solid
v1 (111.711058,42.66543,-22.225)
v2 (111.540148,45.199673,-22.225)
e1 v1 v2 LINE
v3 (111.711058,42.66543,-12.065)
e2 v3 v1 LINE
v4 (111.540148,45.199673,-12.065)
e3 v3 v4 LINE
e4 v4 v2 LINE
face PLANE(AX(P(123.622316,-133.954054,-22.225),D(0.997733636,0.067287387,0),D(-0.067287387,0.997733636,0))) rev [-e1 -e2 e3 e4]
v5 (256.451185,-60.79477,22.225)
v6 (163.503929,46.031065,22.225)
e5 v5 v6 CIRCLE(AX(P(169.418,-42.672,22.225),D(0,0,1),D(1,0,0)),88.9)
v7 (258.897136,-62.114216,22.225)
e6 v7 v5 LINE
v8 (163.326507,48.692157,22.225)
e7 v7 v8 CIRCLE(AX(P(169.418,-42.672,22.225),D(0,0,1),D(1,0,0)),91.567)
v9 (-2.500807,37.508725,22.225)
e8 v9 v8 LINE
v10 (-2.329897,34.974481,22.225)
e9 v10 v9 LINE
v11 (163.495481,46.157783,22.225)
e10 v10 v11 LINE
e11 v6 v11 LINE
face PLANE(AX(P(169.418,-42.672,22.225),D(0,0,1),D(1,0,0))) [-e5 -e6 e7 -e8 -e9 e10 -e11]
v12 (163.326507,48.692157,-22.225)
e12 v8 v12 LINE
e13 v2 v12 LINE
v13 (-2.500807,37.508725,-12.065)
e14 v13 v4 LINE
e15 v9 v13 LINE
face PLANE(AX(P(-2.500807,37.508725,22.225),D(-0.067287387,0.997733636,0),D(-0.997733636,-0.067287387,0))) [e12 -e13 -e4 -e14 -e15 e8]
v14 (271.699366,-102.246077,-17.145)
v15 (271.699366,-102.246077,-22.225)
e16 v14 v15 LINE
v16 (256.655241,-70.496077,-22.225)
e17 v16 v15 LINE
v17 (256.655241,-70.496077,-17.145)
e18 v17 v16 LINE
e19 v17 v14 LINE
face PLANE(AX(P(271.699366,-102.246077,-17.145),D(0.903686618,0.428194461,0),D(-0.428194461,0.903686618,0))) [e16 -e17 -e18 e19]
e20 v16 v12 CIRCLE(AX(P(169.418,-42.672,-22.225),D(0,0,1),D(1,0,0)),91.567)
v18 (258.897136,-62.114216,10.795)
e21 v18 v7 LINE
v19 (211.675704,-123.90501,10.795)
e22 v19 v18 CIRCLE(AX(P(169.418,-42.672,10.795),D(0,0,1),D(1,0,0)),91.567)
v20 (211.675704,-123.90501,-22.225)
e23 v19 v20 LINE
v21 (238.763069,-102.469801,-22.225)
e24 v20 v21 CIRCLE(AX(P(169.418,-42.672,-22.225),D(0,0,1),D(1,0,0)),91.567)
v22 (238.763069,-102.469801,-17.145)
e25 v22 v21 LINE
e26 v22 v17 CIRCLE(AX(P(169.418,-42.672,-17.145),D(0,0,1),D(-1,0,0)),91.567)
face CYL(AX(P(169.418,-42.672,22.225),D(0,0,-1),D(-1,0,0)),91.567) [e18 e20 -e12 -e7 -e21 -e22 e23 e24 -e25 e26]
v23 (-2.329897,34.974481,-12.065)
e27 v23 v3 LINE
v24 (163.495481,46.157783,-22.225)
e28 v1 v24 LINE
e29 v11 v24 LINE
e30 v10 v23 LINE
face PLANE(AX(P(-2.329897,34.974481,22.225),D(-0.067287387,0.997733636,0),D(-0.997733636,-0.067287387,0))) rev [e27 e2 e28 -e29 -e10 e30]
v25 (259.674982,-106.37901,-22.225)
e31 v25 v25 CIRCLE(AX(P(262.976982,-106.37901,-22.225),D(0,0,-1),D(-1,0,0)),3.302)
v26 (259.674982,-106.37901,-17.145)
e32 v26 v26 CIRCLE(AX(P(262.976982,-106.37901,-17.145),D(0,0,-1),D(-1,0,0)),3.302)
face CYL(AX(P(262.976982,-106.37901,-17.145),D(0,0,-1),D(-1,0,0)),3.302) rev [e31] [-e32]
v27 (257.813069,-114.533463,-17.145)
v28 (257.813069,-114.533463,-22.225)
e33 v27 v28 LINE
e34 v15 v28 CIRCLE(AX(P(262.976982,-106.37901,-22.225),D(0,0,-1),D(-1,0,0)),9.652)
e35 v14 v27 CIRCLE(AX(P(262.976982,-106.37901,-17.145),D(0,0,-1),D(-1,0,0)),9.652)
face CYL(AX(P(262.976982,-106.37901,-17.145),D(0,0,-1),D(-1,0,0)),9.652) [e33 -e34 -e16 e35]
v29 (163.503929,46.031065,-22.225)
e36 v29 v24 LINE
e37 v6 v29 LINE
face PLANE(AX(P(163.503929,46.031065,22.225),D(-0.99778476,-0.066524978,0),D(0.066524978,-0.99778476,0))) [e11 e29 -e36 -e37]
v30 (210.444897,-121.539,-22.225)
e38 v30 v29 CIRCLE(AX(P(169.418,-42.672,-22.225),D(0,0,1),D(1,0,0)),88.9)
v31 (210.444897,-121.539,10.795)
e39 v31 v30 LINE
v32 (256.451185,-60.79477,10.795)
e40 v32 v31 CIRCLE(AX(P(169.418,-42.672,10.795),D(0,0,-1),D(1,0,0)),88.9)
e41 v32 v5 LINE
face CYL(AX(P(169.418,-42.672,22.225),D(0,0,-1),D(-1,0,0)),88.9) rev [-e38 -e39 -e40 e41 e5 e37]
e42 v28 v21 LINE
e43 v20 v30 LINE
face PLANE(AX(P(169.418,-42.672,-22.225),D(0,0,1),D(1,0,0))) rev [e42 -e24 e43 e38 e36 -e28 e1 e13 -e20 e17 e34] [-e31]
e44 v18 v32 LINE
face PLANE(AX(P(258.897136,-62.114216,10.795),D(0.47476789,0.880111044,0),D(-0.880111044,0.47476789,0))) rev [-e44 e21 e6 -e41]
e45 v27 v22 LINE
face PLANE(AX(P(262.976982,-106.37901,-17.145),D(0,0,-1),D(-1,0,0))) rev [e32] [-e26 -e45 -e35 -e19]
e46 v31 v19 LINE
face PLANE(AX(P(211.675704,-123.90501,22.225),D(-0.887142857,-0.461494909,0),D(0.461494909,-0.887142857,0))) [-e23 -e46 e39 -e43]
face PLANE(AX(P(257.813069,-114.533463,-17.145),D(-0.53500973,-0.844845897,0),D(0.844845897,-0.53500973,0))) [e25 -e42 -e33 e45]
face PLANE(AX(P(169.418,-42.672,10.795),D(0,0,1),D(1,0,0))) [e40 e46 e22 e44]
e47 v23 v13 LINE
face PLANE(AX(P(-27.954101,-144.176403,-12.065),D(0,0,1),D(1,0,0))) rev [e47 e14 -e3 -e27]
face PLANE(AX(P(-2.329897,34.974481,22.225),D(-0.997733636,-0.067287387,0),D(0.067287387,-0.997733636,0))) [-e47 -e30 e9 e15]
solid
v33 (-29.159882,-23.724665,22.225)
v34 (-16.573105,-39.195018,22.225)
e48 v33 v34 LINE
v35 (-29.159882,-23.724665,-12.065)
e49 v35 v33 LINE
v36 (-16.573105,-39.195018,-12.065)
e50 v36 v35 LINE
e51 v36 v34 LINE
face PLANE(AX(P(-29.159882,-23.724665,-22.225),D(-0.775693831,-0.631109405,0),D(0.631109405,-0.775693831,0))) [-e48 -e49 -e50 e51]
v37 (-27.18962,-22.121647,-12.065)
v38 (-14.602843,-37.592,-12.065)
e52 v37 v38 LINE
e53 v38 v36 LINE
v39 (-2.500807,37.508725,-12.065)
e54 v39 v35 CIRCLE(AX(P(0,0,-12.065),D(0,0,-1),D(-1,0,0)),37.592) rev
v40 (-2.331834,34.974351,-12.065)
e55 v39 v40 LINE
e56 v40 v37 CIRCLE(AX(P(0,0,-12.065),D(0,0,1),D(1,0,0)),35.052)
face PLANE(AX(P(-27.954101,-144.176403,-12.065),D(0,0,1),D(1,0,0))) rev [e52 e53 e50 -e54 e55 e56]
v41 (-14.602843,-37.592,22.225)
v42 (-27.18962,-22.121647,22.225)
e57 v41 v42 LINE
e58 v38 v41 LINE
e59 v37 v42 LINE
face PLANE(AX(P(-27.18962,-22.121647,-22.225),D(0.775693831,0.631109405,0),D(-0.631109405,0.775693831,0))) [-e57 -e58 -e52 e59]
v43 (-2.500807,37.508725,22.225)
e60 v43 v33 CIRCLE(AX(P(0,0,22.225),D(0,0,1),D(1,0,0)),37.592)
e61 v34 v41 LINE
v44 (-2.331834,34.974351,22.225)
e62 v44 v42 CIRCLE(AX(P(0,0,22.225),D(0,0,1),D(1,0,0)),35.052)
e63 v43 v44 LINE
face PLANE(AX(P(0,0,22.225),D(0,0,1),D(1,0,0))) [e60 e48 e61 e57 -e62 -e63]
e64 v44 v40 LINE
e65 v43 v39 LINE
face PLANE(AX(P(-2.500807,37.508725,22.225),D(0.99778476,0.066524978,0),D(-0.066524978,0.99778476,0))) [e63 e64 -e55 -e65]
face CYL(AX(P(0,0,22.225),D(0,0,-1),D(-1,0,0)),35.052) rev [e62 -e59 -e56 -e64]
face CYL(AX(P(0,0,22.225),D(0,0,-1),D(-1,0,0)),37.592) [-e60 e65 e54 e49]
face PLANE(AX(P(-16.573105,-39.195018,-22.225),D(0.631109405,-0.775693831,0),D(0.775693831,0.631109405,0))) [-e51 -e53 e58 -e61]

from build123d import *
from OCP.BRepAlgoAPI import BRepAlgoAPI_Cut
from OCP.TopTools import TopTools_ListOfShape

# Parameters (mm, degrees)
EXTRUDE_THIN1_DEPTH = 22.224999999999998
EXTRUDE_THIN2_DEPTH = 22.224999999999998
EXTRUDE_THIN3_DEPTH = 22.224999999999998
CUT_EXTRUDE2_DEPTH  = 11.43
SKETCH11_R          = 3.3020000000000405
BOSS_EXTRUDE1_DEPTH = 5.08
CUT_EXTRUDE5_DEPTH  = 303.7454642008095
BOSS_EXTRUDE5_DEPTH = 44.45
CUT_EXTRUDE7_DEPTH  = 320.7810072191918


with BuildPart() as part:
    # Sketch1 → Extrude-Thin1 (new, symmetric)
    with BuildSketch(Plane.XY):
        with BuildLine():
            ThreePointArc((-2.331833528473019, 34.974351407788646), (-33.41280778757034, 10.593723601778466), (-22.057728390521078, -27.2415))
            Line((-22.057728390521078, -27.2415), (-23.65611450577623, -29.215521739130434))
            ThreePointArc((-23.65611450577623, -29.215521739130434), (-35.83402574319137, 11.361384732342133), (-2.500806972565267, 37.50872469820812))
            Line((-2.500806972565267, 37.50872469820812), (-2.331833528473019, 34.974351407788646))
        make_face()
    extrude(amount=EXTRUDE_THIN1_DEPTH, both=True)

    # Sketch17 → Cut-Extrude5 (cut, through all)
    with BuildSketch(Plane.XY.offset(22.224999999999998)):
        with BuildLine():
            Line((-29.159882495618955, -23.724664736128418), (-27.18962016483388, -22.121646848552164))
            Line((-27.18962016483388, -22.121646848552164), (-22.057728390521085, -27.24149999999998))
            Line((-22.057728390521085, -27.24149999999998), (-23.65611450577624, -29.215521739130416))
            ThreePointArc((-23.65611450577624, -29.215521739130416), (-26.550325091601046, -26.6127544897235), (-29.159882495618955, -23.724664736128418))
        make_face()
    extrude(amount=-CUT_EXTRUDE5_DEPTH, mode=Mode.SUBTRACT)

    # Sketch18 → Boss-Extrude5 (add, through all)
    with BuildSketch(Plane.XY.offset(22.224999999999998)):
        with BuildLine():
            Line((-29.159882495618955, -23.724664736128418), (-16.57310537390898, -39.19501788757624))
            Line((-16.57310537390898, -39.19501788757624), (-14.602843043123915, -37.59199999999999))
            Line((-14.602843043123915, -37.59199999999999), (-27.18962016483388, -22.121646848552164))
            ThreePointArc((-27.18962016483388, -22.121646848552164), (-32.138253083569026, 13.99197601257467), (-2.3318335284730156, 34.97435140778865))
            Line((-2.3318335284730156, 34.97435140778865), (-2.5008069725652633, 37.50872469820813))
            ThreePointArc((-2.5008069725652633, 37.50872469820813), (-34.46711200266824, 15.005887317833707), (-29.159882495618955, -23.724664736128418))
        make_face()
    extrude(amount=-BOSS_EXTRUDE5_DEPTH)


with BuildPart() as body_2:
    # Sketch2 → Extrude-Thin2 (new, symmetric)
    with BuildSketch(Plane.XY):
        with BuildLine():
            ThreePointArc((210.44489740889506, -121.53899999999999), (255.02266889982377, -18.69178601947969), (163.5039294567713, 46.031065164681365))
            Line((163.5039294567713, 46.031065164681365), (163.32650734047442, 48.69215711962181))
            ThreePointArc((163.32650734047442, 48.69215711962181), (257.5908089668185, -17.972379600064077), (211.6757043311619, -123.90500999999999))
            Line((211.6757043311619, -123.90500999999999), (210.44489740889506, -121.53899999999999))
        make_face()
    extrude(amount=EXTRUDE_THIN2_DEPTH, both=True)

    # Sketch4 → Extrude-Thin3 (add, symmetric)
    with BuildSketch(Plane.XY):
        Polygon((-2.5008069725652633, 37.50872469820813), (163.3265073404744, 48.69215711962182), (163.4974173036775, 46.157913685285266), (-2.329897009362141, 34.974481263871574), align=None)
    extrude(amount=EXTRUDE_THIN3_DEPTH, both=True)

    # Sketch9 → Cut-Extrude2 (cut)
    with BuildSketch(Plane.XY.offset(22.224999999999998)):
        with BuildLine():
            Line((210.44489740889503, -121.53899999999999), (211.6757043311619, -123.90501))
            ThreePointArc((211.6757043311619, -123.90501), (242.1722048894427, -98.27183057442694), (258.8971357878048, -62.11421560593305))
            Line((258.8971357878048, -62.11421560593305), (256.45118461979064, -60.79476951620356))
            ThreePointArc((256.45118461979064, -60.79476951620356), (240.28626889776245, -96.34600174604482), (210.44489740889503, -121.53899999999999))
        make_face()
    extrude(amount=-CUT_EXTRUDE2_DEPTH, mode=Mode.SUBTRACT)

    # Sketch11 → Boss-Extrude1 (add)
    with BuildSketch(Plane(origin=(0, 0, -22.224999999999998), x_dir=(-1, 0, 0), z_dir=(0, 0, -1))):
        with BuildLine():
            Line((-271.69936572083293, -102.24607705891748), (-256.65524104314295, -70.49607705891748))
            ThreePointArc((-256.65524104314295, -70.49607705891748), (-249.32472481112566, -87.38699545967683), (-238.76306857281796, -102.46980057519824))
            Line((-238.76306857281796, -102.46980057519824), (-257.813068572818, -114.53346259368794))
            ThreePointArc((-257.813068572818, -114.53346259368794), (-269.373124822864, -113.60745846421521), (-271.69936572083293, -102.24607705891748))
        make_face()
        with Locations((-262.9769824854714, -106.37901000000001)):
            Circle(SKETCH11_R, mode=Mode.SUBTRACT)
    extrude(amount=-BOSS_EXTRUDE1_DEPTH)


with BuildPart() as cut_extrude7_tool:
    # Sketch19 → Cut-Extrude7 (new, through all)
    with BuildSketch(Plane(origin=(-2.529466716951779, 37.50679187841974, 0), x_dir=(0.9977336355655706, 0.06728738708784333, 0), z_dir=(-0.06728738708784333, 0.9977336355655706, 0))):
        Polygon((-37.591999999999985, 22.224999999999998), (114.3287248453544, 22.224999999999998), (114.32872484535442, 12.064999999999998), (-37.591999999999985, 12.064999999999998), align=None)
    extrude(amount=-CUT_EXTRUDE7_DEPTH)


with BuildPart() as part_1:
    add(part.part)

    # Cut-Extrude7: cut by cut_extrude7_tool, with a tolerance
    cut_extrude7_stock = TopTools_ListOfShape()
    cut_extrude7_stock.Append(part_1.part.wrapped)
    cut_extrude7_tools = TopTools_ListOfShape()
    cut_extrude7_tools.Append(cut_extrude7_tool.part.wrapped)
    cut_extrude7_cut = BRepAlgoAPI_Cut()
    cut_extrude7_cut.SetArguments(cut_extrude7_stock)
    cut_extrude7_cut.SetTools(cut_extrude7_tools)
    cut_extrude7_cut.SetFuzzyValue(0.00001)
    cut_extrude7_cut.Build()
    add(Compound.cast(cut_extrude7_cut.Shape()).solids(), mode=Mode.REPLACE)


with BuildPart() as body_2_1:
    add(body_2.part)

    # Cut-Extrude7: cut by cut_extrude7_tool, with a tolerance
    cut_extrude7_2_stock = TopTools_ListOfShape()
    cut_extrude7_2_stock.Append(body_2_1.part.wrapped)
    cut_extrude7_2_tools = TopTools_ListOfShape()
    cut_extrude7_2_tools.Append(cut_extrude7_tool.part.wrapped)
    cut_extrude7_2_cut = BRepAlgoAPI_Cut()
    cut_extrude7_2_cut.SetArguments(cut_extrude7_2_stock)
    cut_extrude7_2_cut.SetTools(cut_extrude7_2_tools)
    cut_extrude7_2_cut.SetFuzzyValue(0.00001)
    cut_extrude7_2_cut.Build()
    add(Compound.cast(cut_extrude7_2_cut.Shape()).solids(), mode=Mode.REPLACE)


solid = Compound([part_1.part, body_2_1.part])
